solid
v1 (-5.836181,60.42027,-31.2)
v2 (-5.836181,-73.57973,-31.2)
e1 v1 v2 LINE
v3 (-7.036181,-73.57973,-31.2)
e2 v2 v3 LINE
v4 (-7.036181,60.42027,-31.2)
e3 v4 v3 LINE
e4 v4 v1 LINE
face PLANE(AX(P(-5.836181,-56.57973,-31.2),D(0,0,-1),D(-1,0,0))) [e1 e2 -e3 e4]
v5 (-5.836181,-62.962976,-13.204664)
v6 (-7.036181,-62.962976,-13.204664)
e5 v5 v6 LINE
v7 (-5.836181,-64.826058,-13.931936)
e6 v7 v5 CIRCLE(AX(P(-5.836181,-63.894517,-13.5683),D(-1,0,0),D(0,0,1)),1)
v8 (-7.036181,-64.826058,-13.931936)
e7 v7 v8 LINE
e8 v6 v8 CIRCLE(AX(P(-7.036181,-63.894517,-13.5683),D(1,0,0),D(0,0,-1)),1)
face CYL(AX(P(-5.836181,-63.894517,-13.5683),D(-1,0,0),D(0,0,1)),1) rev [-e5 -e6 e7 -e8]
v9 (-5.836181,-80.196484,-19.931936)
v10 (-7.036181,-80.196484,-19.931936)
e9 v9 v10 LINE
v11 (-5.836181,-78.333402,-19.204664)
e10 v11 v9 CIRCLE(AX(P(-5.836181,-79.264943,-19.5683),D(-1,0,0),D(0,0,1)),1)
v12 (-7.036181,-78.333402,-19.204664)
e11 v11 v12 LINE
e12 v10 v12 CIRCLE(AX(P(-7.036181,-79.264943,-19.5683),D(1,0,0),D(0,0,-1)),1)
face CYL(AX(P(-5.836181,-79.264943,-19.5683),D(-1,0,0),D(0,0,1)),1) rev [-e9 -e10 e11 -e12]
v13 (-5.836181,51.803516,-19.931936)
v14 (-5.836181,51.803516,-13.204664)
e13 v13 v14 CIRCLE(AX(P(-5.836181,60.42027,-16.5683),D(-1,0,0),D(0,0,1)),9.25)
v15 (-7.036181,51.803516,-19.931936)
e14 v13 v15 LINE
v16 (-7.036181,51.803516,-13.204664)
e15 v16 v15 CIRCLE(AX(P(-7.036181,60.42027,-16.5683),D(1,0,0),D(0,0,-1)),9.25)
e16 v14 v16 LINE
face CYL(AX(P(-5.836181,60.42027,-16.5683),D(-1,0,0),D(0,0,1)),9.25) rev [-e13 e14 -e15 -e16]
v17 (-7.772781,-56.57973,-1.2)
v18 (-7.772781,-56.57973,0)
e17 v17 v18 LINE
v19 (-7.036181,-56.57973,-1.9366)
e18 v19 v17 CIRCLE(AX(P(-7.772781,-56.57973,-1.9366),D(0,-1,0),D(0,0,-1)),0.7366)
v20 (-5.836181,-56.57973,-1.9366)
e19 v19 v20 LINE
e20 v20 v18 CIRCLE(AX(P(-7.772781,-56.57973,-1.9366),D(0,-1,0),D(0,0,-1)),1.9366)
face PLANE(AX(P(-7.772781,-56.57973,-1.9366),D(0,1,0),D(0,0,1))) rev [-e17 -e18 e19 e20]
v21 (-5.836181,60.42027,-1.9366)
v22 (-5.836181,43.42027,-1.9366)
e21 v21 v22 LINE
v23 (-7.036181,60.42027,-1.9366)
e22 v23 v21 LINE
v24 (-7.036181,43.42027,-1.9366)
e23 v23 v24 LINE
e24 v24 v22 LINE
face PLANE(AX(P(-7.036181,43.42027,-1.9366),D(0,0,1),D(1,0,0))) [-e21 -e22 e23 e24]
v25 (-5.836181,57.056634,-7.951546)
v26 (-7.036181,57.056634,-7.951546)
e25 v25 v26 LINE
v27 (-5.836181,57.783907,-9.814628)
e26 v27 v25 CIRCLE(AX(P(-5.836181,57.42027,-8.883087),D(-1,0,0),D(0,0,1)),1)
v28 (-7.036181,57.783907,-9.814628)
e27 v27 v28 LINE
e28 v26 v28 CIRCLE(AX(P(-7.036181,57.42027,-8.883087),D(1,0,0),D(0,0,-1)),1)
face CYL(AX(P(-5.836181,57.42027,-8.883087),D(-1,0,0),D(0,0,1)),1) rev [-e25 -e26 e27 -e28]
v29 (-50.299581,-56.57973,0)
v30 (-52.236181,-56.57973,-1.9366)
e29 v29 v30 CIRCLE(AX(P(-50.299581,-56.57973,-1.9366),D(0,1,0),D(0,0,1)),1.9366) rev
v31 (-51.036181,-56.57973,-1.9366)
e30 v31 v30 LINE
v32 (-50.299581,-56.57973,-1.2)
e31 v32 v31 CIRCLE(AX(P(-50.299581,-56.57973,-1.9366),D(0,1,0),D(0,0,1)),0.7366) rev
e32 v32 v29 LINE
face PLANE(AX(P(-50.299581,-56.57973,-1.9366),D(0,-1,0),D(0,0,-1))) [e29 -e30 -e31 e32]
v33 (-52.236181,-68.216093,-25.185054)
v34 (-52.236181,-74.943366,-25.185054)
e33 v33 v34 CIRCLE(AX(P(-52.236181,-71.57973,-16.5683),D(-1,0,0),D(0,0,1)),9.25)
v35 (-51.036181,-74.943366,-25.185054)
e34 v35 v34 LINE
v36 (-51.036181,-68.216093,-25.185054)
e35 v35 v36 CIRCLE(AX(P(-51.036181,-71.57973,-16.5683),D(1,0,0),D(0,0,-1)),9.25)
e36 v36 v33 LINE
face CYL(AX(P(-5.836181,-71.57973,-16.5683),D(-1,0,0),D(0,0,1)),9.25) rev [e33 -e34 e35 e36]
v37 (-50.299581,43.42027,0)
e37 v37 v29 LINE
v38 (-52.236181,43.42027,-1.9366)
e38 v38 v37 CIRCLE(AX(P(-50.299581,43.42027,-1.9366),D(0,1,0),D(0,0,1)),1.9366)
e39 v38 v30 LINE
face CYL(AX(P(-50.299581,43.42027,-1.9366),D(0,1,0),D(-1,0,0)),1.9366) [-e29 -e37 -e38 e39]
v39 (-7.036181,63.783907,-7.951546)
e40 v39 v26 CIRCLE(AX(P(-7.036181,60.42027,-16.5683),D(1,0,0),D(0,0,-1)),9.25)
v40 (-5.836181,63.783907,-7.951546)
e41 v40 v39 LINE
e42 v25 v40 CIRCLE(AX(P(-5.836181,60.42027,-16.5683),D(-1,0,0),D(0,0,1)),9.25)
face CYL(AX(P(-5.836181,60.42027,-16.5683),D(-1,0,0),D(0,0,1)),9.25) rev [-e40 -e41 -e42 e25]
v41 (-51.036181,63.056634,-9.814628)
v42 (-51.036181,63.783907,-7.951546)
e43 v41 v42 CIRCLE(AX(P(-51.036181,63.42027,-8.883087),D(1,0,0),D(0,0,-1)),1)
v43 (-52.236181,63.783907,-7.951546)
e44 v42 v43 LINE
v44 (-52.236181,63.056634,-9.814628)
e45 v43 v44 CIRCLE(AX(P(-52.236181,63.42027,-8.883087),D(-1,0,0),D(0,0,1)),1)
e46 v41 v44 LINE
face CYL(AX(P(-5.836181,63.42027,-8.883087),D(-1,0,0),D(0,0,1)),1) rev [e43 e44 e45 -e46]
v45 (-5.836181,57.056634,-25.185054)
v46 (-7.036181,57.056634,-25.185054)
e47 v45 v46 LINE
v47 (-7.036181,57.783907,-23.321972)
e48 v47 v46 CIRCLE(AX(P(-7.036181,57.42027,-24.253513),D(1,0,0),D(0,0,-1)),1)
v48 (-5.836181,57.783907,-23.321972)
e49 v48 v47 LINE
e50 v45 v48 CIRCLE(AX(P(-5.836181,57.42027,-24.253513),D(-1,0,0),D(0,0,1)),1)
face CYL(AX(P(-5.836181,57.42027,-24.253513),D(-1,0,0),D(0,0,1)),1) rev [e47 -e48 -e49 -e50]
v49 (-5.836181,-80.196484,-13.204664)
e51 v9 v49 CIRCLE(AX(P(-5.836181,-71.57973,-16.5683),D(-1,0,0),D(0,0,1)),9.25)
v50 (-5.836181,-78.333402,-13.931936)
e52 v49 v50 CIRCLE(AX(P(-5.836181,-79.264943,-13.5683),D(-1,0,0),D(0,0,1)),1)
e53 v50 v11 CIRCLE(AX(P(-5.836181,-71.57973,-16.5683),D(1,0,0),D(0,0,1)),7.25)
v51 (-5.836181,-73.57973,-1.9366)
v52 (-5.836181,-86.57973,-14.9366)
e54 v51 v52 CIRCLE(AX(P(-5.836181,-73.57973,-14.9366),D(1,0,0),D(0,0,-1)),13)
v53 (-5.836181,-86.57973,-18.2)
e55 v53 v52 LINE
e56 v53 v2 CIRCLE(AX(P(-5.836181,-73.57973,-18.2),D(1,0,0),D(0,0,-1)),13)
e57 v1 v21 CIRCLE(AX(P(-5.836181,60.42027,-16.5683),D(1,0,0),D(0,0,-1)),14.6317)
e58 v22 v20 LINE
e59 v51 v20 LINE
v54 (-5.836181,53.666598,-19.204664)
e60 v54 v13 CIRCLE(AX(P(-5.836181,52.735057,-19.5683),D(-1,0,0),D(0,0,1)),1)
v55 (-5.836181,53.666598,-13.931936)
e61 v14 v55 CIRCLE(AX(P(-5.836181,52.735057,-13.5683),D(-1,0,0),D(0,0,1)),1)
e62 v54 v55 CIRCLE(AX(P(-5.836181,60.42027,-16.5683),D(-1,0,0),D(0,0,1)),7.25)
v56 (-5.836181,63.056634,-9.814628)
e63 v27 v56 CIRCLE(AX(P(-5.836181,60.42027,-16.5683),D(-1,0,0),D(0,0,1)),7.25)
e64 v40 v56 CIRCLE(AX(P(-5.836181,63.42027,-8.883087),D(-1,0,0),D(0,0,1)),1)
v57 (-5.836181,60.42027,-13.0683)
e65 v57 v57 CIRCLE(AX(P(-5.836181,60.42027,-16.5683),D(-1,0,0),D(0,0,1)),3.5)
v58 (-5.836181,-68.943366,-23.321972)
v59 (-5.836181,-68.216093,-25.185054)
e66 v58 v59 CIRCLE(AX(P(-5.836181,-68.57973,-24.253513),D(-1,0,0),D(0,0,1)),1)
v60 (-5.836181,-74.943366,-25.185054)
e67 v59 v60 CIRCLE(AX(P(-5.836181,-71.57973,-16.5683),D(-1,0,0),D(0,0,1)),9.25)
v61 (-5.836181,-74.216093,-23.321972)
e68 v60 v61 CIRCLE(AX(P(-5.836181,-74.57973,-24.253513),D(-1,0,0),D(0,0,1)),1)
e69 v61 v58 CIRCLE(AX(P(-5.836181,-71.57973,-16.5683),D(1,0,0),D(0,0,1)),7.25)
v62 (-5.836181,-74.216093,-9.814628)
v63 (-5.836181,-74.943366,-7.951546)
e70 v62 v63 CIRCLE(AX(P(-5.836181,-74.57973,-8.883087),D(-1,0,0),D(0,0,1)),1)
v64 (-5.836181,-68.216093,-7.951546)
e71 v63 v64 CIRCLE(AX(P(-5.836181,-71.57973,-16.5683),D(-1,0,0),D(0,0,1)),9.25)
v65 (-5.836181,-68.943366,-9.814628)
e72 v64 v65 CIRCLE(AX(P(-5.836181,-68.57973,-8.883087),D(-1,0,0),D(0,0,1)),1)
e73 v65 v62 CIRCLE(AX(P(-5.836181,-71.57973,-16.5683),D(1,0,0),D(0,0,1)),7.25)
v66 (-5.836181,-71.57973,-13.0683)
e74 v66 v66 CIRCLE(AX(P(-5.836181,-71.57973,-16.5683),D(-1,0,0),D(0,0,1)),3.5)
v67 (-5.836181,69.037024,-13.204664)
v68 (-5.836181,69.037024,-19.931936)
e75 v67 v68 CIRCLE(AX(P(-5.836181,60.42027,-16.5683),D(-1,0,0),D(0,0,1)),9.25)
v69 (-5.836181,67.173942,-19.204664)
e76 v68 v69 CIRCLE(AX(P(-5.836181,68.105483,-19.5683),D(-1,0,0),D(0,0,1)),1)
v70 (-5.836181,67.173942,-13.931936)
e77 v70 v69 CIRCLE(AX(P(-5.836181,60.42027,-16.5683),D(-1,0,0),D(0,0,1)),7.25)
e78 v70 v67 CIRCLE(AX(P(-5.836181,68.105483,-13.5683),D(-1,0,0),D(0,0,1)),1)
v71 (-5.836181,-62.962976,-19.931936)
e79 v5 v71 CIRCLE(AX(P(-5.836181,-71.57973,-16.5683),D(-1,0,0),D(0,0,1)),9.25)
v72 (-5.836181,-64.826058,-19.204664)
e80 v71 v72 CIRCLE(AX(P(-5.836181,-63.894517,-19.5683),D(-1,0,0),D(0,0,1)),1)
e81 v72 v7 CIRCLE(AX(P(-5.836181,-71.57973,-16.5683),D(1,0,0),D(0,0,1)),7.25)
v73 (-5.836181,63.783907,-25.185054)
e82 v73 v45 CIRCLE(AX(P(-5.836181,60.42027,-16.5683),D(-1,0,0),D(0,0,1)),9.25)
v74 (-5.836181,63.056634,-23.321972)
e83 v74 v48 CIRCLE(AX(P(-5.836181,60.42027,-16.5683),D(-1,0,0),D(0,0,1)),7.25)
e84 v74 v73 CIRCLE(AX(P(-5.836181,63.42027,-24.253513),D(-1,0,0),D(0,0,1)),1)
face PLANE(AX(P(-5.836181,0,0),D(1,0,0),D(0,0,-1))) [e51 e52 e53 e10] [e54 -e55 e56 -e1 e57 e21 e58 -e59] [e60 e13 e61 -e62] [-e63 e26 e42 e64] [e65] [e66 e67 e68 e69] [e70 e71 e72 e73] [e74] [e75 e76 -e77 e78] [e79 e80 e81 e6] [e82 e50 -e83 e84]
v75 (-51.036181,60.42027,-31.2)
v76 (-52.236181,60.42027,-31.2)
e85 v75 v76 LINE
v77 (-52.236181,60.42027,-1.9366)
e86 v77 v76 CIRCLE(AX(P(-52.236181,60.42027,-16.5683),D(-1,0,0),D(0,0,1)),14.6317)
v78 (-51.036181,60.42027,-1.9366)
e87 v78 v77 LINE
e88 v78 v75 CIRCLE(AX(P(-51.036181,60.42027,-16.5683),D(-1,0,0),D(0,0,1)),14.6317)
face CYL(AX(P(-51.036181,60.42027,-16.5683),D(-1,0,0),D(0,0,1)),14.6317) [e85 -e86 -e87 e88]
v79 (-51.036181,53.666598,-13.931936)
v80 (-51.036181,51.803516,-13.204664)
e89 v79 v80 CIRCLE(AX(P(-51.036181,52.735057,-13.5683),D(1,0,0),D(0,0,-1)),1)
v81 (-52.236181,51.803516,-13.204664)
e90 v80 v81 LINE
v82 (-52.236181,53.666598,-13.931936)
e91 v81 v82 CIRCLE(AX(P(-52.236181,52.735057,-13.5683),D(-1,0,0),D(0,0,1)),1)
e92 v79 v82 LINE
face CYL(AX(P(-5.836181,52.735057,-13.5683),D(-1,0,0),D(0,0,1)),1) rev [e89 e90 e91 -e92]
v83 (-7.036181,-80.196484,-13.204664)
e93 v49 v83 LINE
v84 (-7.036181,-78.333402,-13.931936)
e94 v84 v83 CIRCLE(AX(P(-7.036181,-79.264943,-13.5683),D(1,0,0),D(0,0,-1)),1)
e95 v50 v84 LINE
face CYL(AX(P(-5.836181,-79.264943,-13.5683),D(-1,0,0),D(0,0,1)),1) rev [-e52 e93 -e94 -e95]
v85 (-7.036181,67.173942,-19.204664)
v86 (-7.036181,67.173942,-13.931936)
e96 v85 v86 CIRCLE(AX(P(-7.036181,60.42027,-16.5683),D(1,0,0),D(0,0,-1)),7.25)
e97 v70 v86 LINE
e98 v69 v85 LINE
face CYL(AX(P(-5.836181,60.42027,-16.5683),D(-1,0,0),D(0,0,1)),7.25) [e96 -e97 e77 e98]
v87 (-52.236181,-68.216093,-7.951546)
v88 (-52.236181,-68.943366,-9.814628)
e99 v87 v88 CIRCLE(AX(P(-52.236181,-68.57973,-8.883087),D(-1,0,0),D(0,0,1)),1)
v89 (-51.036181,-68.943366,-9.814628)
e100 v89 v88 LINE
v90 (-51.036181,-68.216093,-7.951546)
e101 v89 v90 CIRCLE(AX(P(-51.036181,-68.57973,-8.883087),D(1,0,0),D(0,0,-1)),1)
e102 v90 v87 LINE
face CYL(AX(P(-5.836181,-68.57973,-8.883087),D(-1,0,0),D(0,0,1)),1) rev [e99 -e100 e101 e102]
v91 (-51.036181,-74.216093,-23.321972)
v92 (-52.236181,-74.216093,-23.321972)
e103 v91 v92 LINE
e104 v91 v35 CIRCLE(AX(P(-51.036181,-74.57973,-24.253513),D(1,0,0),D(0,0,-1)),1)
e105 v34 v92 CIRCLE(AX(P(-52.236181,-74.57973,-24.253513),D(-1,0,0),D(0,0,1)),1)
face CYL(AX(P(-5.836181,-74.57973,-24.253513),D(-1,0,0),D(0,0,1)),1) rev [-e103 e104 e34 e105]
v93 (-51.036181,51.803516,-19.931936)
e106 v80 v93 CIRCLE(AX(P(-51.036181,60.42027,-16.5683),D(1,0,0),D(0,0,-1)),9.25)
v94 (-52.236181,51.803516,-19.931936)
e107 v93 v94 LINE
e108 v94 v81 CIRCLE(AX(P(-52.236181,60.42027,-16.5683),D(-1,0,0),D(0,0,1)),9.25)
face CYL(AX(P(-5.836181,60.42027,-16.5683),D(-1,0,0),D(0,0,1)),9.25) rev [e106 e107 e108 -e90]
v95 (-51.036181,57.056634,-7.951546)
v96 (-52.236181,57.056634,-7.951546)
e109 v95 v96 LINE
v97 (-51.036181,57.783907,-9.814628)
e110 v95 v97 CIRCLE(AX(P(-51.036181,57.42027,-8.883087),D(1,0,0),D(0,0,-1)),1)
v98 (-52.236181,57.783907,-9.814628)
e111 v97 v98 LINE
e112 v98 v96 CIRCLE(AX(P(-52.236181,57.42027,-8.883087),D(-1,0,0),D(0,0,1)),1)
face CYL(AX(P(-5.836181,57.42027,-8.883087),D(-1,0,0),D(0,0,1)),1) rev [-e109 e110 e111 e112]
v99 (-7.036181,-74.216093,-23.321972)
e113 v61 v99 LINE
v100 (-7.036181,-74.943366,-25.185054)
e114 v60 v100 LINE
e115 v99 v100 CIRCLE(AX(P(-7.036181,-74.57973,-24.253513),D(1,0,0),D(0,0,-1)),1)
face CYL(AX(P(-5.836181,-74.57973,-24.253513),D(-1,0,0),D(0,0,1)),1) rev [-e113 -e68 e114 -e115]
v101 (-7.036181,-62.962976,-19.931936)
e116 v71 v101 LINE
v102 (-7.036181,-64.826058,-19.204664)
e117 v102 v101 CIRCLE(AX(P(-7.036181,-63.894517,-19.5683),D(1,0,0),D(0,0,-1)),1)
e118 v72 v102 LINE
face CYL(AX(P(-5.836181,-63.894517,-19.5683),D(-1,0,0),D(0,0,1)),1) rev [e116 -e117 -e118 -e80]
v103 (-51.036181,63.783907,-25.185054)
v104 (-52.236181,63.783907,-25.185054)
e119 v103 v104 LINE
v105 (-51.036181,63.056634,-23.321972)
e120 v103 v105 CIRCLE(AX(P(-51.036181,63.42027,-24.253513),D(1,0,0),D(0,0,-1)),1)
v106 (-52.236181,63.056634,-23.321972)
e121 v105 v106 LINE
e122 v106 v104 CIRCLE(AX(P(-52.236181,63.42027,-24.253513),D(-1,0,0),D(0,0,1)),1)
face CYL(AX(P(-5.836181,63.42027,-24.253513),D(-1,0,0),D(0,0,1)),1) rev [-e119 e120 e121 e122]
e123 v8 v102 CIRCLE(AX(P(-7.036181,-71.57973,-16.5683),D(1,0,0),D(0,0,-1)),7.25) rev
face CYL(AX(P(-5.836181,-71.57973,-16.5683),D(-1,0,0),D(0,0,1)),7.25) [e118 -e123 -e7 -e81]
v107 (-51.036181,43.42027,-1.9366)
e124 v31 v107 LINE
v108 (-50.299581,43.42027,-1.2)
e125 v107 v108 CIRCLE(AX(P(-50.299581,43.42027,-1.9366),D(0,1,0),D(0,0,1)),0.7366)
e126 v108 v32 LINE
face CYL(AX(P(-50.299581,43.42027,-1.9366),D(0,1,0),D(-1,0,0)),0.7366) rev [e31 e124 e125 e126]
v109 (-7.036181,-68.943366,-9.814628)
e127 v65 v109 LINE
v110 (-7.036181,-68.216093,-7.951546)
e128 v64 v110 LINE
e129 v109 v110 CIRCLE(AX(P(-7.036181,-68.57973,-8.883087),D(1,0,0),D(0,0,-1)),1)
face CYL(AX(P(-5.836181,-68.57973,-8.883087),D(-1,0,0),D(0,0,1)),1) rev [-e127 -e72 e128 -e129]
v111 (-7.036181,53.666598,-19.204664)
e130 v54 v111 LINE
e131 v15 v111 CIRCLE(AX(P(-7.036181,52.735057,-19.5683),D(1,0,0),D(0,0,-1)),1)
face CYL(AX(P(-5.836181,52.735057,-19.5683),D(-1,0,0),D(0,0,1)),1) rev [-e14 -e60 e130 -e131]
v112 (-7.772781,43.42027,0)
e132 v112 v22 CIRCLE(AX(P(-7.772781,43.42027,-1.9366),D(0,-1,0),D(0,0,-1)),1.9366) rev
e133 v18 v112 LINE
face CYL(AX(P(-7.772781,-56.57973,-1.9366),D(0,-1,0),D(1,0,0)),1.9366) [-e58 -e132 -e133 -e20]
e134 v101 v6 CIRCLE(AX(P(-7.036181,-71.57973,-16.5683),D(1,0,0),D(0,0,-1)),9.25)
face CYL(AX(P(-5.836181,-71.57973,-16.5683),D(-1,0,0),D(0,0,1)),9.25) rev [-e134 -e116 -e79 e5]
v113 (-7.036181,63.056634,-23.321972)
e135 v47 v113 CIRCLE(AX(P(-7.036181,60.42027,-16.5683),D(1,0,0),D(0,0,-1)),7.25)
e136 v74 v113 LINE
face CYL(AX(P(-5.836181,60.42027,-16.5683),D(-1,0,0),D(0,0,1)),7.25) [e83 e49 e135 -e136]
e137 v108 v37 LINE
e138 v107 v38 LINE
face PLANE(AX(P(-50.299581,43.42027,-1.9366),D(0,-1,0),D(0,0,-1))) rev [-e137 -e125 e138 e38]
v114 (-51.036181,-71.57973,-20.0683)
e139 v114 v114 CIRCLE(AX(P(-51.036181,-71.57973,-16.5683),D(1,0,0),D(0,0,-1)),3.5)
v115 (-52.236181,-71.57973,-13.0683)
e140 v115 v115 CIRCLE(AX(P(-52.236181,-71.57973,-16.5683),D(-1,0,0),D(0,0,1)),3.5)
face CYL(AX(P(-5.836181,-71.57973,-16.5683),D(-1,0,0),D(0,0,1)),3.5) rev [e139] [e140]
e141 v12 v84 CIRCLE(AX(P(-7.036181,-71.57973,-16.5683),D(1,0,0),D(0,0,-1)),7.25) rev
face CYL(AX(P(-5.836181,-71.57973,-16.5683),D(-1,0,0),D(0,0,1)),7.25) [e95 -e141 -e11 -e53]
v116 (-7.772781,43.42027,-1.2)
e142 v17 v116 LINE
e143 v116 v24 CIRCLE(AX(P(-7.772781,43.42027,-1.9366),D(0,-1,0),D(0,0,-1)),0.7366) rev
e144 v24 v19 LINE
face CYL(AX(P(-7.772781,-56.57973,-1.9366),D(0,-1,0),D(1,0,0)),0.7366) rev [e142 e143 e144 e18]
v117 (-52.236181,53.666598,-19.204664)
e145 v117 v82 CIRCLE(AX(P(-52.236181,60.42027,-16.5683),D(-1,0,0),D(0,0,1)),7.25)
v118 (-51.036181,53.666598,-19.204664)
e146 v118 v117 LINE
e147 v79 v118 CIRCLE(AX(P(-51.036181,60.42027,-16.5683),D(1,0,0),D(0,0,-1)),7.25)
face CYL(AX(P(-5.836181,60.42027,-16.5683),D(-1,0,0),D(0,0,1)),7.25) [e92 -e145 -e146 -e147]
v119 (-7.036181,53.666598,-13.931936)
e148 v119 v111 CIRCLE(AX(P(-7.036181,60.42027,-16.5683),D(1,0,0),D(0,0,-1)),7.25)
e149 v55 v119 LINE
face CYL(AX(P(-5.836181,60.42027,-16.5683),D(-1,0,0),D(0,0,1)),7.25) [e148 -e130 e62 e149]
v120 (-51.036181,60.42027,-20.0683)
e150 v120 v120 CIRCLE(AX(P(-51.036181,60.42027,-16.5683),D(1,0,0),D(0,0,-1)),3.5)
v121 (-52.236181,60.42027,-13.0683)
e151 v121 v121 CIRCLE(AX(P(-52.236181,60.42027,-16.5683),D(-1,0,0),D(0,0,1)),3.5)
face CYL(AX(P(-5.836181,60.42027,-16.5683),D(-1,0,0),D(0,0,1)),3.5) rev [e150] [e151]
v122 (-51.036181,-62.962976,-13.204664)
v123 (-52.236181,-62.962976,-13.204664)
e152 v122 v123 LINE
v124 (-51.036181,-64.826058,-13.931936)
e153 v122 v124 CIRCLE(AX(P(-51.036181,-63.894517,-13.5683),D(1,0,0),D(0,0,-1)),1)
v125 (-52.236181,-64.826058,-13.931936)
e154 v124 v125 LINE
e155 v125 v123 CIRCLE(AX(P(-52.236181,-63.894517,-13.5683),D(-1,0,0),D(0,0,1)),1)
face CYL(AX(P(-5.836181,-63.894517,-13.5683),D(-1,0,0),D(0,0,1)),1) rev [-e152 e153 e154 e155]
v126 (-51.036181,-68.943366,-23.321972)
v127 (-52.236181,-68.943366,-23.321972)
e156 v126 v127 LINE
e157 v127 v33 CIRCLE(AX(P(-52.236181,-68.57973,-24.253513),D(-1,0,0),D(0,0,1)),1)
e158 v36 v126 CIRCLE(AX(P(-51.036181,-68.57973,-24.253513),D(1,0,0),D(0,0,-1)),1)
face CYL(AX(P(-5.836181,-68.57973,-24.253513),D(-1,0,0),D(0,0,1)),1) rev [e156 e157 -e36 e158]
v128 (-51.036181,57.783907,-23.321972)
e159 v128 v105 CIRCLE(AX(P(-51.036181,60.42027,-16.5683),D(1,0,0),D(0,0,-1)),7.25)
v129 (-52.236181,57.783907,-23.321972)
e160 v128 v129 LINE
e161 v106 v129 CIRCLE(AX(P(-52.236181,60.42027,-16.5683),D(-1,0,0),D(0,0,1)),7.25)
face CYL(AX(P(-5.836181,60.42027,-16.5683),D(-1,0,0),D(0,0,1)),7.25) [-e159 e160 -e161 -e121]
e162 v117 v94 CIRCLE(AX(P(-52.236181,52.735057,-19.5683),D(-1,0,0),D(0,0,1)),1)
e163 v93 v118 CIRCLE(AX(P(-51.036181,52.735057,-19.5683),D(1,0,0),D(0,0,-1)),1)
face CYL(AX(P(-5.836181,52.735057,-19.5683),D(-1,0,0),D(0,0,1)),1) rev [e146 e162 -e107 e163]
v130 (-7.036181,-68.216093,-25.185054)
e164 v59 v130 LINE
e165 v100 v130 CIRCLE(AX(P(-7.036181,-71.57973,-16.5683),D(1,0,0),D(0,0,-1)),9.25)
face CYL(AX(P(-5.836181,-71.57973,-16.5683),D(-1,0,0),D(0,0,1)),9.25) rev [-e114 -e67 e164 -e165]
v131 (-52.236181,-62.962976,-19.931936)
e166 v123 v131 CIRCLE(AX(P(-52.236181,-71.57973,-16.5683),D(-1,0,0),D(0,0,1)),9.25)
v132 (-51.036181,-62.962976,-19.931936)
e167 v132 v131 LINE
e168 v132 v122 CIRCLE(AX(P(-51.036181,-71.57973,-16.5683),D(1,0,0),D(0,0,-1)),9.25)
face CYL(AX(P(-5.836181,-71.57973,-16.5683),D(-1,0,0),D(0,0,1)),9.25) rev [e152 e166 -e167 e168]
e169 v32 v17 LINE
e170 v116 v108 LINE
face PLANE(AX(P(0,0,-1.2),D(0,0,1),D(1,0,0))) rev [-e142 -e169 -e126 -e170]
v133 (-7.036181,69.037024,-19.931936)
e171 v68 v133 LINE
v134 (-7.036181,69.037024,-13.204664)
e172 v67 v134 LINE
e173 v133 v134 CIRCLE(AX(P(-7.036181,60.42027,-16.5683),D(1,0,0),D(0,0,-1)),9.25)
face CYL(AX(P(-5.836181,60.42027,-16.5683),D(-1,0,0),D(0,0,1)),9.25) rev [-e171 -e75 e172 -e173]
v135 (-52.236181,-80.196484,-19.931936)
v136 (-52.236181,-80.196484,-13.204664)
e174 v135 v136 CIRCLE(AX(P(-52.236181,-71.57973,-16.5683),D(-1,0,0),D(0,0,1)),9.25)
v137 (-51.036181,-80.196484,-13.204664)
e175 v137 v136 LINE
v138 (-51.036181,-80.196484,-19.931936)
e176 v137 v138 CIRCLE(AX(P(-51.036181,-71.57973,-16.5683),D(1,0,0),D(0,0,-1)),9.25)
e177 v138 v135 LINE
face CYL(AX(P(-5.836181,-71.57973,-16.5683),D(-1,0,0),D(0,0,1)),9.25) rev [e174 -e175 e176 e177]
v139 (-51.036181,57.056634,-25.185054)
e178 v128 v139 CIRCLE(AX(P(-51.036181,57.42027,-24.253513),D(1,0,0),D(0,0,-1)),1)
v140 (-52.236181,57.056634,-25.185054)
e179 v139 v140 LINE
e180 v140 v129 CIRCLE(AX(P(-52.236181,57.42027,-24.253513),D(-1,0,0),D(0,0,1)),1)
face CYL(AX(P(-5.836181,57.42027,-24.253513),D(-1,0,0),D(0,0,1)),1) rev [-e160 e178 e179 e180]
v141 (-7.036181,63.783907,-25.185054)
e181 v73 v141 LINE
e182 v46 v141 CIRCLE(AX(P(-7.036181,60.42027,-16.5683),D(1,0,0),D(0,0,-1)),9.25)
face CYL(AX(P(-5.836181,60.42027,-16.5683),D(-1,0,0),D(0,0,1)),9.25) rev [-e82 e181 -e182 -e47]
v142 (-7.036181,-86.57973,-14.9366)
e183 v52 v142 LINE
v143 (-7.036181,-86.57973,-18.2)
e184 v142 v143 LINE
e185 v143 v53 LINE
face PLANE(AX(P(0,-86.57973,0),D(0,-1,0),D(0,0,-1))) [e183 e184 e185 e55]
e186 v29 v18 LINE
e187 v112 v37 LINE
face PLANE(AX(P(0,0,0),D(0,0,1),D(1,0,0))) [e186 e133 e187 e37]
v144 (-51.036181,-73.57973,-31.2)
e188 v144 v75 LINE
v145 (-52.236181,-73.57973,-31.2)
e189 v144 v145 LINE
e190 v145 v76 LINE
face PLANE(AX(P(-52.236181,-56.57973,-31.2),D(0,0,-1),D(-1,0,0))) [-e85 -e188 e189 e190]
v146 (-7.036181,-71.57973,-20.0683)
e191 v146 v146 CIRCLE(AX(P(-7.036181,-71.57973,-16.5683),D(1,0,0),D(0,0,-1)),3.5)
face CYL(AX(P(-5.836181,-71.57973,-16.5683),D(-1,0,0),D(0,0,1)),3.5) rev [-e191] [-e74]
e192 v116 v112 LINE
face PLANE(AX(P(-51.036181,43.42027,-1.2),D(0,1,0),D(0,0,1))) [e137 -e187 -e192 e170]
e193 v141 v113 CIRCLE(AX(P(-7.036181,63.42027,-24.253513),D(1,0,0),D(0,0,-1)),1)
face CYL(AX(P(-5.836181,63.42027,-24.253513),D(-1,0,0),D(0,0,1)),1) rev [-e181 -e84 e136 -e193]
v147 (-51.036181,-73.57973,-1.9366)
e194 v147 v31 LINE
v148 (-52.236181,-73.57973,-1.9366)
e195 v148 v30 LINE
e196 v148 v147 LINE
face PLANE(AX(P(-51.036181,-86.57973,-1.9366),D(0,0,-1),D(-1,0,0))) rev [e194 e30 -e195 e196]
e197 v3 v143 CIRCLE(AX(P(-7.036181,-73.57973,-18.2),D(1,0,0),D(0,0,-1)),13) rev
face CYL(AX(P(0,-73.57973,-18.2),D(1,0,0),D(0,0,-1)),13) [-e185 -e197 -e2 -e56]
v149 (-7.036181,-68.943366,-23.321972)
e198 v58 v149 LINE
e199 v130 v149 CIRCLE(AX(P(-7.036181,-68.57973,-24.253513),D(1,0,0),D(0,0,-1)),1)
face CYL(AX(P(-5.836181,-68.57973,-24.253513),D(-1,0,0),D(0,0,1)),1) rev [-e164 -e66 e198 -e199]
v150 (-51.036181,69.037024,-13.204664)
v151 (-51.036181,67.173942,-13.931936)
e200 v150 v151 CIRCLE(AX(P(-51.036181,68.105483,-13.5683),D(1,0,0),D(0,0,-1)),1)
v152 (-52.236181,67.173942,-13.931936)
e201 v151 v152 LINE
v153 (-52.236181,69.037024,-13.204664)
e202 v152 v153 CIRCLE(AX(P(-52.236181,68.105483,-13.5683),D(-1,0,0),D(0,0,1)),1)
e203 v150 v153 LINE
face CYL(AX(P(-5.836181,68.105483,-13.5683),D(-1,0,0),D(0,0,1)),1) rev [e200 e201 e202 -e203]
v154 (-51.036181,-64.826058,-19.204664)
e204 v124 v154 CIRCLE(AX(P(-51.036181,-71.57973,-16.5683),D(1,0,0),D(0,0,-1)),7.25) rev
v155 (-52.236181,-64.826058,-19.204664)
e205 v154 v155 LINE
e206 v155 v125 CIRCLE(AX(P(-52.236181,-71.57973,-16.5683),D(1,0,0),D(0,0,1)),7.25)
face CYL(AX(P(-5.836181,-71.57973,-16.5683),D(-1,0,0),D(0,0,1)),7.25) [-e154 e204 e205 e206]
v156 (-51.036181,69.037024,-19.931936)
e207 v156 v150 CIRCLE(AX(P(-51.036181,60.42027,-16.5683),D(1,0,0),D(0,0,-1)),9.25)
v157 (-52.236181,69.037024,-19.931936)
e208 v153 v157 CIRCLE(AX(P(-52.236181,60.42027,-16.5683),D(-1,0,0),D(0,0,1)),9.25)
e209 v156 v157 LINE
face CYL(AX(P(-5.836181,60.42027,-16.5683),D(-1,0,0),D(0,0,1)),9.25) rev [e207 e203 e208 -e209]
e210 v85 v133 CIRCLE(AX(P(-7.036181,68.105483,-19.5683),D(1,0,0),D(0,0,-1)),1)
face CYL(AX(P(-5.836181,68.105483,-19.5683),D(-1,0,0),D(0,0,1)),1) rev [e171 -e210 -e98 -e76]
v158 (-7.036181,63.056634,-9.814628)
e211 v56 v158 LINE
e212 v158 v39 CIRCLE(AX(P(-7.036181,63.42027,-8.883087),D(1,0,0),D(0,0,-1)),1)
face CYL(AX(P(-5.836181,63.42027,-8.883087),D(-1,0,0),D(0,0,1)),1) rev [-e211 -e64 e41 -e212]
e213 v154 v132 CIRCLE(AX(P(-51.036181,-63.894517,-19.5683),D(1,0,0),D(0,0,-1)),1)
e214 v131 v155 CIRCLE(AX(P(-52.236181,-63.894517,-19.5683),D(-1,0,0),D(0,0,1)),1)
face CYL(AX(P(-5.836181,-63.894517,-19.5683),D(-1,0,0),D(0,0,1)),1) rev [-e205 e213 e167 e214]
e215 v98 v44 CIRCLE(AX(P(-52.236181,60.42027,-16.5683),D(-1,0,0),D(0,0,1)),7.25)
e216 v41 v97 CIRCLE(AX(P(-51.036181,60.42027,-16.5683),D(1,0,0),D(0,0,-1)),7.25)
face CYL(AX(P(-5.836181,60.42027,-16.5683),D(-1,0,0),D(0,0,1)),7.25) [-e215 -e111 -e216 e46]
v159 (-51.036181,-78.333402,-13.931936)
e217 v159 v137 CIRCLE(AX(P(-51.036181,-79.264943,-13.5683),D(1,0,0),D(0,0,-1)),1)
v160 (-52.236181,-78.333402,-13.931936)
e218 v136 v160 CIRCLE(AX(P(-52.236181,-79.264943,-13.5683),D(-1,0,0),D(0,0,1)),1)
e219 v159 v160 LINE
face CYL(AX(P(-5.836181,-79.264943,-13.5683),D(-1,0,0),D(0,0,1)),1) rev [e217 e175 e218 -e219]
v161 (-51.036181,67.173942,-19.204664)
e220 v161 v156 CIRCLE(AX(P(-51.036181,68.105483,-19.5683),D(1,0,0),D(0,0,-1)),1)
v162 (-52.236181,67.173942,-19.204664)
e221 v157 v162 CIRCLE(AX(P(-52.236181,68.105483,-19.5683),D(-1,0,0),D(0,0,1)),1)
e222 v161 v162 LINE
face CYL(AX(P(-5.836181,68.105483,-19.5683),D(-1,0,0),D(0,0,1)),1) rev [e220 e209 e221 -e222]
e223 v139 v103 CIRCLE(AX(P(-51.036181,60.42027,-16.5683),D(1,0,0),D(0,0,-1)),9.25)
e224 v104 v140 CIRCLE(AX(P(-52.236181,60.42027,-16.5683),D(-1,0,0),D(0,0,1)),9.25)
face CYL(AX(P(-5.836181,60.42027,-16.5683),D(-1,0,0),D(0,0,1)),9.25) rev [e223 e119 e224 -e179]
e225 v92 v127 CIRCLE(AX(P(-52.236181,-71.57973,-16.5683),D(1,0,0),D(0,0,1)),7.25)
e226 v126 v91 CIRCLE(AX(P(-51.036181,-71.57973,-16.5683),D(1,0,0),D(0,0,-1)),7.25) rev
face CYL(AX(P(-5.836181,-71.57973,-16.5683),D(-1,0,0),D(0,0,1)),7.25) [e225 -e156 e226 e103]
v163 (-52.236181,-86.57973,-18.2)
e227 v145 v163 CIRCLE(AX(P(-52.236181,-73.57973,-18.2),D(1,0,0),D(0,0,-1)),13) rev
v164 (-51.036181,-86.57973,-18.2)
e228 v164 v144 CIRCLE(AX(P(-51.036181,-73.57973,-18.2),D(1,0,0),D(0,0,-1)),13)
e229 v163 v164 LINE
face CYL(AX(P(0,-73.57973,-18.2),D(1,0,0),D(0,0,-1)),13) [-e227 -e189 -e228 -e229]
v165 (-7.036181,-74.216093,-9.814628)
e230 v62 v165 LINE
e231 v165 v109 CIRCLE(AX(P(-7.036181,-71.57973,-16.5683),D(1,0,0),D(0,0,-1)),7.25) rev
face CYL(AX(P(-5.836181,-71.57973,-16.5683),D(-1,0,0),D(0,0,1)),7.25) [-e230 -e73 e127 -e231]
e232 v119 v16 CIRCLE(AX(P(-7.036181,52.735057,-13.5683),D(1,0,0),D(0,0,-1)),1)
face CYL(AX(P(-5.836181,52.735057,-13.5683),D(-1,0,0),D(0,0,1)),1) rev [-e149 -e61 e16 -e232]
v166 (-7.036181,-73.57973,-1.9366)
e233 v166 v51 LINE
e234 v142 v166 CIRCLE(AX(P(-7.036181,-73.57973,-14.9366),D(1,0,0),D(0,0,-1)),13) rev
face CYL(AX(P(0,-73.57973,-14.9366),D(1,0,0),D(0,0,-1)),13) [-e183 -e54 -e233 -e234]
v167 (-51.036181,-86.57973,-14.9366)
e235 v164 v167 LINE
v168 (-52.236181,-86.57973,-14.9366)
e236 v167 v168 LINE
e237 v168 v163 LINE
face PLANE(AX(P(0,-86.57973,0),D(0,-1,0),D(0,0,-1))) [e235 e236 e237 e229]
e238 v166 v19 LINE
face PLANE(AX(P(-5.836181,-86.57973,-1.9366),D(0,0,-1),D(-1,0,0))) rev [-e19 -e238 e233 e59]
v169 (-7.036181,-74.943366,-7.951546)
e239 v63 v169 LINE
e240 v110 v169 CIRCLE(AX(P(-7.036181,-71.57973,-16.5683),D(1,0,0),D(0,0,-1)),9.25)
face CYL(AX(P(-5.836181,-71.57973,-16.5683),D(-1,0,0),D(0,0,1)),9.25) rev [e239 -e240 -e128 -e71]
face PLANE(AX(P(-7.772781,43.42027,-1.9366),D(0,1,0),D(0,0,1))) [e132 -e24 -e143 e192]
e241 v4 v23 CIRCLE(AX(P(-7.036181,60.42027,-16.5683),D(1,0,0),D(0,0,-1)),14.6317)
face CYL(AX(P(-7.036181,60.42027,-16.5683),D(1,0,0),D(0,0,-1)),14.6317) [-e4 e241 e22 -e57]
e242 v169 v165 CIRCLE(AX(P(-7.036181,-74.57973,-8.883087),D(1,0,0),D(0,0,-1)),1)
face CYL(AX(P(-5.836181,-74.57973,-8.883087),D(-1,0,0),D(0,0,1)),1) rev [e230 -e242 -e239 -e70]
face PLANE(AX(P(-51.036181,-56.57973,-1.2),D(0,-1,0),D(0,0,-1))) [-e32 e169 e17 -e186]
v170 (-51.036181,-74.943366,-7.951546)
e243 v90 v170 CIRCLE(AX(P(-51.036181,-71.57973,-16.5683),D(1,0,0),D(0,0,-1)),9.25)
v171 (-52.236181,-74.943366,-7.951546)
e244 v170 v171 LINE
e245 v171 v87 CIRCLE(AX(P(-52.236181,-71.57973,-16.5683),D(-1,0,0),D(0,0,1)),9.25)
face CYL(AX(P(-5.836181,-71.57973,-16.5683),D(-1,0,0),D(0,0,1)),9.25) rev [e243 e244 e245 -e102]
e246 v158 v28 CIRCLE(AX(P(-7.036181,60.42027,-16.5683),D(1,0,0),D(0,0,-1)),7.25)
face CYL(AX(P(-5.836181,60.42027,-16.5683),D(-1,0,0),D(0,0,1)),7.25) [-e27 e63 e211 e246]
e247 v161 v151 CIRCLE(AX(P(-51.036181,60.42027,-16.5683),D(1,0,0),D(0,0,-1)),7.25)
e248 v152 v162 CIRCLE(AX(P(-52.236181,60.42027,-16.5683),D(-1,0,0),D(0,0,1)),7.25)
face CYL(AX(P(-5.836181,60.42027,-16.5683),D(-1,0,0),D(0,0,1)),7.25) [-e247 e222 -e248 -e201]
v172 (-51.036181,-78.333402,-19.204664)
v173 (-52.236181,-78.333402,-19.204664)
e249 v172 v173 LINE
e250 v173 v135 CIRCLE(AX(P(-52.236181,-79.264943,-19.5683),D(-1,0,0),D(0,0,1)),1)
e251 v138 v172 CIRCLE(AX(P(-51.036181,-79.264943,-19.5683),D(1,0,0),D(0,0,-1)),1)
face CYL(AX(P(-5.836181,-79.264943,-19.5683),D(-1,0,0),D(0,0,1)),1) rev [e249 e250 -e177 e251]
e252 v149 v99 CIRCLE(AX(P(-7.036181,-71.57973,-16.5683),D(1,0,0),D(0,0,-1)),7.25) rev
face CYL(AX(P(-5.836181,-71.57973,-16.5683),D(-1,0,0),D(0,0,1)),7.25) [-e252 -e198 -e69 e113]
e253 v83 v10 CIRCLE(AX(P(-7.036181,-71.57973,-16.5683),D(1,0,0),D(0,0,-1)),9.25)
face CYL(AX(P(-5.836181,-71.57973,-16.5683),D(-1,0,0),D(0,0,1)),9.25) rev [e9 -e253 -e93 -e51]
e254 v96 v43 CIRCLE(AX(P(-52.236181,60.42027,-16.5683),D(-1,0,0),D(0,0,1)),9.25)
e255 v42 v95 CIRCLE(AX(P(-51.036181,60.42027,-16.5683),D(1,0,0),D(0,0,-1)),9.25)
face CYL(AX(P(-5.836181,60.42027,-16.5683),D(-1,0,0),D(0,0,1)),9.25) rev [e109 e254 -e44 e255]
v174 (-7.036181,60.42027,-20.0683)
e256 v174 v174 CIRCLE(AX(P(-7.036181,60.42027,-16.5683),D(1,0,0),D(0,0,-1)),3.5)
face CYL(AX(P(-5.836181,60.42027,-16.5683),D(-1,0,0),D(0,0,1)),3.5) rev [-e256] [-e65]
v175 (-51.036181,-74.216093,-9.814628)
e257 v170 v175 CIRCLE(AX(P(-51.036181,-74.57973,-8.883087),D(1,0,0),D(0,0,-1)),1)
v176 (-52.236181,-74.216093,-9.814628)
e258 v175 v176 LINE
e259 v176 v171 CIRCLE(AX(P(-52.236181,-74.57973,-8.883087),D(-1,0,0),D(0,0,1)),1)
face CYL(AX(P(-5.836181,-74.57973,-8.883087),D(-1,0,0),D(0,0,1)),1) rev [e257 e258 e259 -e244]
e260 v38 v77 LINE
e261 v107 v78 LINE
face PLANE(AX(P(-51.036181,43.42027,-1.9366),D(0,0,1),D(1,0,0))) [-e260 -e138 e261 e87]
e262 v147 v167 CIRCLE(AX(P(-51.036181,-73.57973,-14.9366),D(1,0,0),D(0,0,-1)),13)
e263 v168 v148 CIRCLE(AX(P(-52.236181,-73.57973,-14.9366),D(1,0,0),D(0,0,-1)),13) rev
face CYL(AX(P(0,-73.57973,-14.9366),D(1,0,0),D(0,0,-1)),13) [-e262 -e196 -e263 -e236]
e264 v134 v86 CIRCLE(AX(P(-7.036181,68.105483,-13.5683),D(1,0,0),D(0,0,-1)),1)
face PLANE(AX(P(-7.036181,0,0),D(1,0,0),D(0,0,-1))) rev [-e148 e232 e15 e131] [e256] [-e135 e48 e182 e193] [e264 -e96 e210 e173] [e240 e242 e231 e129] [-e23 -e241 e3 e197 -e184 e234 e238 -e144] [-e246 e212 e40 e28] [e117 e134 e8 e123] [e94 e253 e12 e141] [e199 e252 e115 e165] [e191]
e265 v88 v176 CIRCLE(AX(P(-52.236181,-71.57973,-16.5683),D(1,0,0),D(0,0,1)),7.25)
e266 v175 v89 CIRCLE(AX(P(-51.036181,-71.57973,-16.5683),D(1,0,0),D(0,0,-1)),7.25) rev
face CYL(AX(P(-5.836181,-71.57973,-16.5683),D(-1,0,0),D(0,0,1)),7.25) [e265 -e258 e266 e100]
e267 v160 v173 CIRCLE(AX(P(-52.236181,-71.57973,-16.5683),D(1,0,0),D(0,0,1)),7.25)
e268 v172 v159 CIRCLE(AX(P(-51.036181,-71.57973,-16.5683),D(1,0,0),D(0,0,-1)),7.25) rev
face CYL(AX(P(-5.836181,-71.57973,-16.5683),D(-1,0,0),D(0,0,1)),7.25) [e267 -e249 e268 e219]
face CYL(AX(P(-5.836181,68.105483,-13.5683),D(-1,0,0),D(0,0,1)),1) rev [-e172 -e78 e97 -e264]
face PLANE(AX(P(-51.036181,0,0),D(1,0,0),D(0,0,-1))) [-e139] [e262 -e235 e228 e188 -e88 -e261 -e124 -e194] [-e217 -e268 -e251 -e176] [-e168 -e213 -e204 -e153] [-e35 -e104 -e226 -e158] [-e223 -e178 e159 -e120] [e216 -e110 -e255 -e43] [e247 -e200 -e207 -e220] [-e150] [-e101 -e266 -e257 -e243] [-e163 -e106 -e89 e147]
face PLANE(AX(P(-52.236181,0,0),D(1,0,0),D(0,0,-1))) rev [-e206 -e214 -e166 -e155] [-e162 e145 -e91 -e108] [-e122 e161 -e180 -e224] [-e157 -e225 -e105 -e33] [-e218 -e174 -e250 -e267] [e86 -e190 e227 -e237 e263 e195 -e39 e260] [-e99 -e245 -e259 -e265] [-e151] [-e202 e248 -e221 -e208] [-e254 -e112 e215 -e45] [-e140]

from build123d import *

# Parameters (mm, degrees)
SKETCH_1_W                         = 44
SKETCH_1_H                         = 100
SM_BASE_FLANGE_1_DEPTH             = 1.2
SM_EDGE_FLANGE_2_STRIP_W           = 6.2732
SM_EDGE_FLANGE_2_STRIP_H           = 1.2
SM_EDGE_FLANGE_2_STRIP_CUT_DEPTH   = 100
SM_EDGE_FLANGE_2_STRIP_2_W         = 6.2732
SM_EDGE_FLANGE_2_STRIP_2_H         = 1.2
SM_EDGE_FLANGE_2_STRIP_CUT_2_DEPTH = 100
SM_EDGE_FLANGE_2_DEPTH             = 100
SM_EDGE_FLANGE_2_BEND_DEPTH        = 100
EXTRUDE_1_DEPTH                    = 1.2
EXTRUDE_START                      = -1.2
EXTRUDE_2_DEPTH                    = 1.2
SKETCH_44_R                        = 3.5
CUT_EXTRUDE_3_DEPTH                = 94.590588423
SKETCH_45_W                        = 1.2
SKETCH_45_H                        = 29.2634
EXTRUDE_3_DEPTH                    = 30
SKETCH_48_R                        = 3.5
CUT_EXTRUDE_4_DEPTH                = 104.065268641
FILLET_1_R                         = 13


# Sheet-metal steps are written as plain solids
with BuildPart() as part:
    # Sketch 1 → 基材-凸緣1 (new body)
    with BuildSketch(Plane.XY):
        with Locations((-29.036181479, -6.57972973)):
            Rectangle(SKETCH_1_W, SKETCH_1_H)
    extrude(amount=-SM_BASE_FLANGE_1_DEPTH)

    # 邊線-凸緣2 strip (across the edge) → 邊線-凸緣2 strip cut (cut)
    with BuildSketch(Plane(origin=(-7.036181479, 43.42027027, -1.2), x_dir=(-1, 0, 0), z_dir=(0, -1, 0))):
        with Locations((-2.4, -0.6)):
            Rectangle(SM_EDGE_FLANGE_2_STRIP_W, SM_EDGE_FLANGE_2_STRIP_H)
    extrude(amount=SM_EDGE_FLANGE_2_STRIP_CUT_DEPTH, mode=Mode.SUBTRACT)

    # 邊線-凸緣2 strip 2 (across the edge) → 邊線-凸緣2 strip cut 2 (cut)
    with BuildSketch(Plane(origin=(-51.036181479, -56.57972973, -1.2), x_dir=(1, 0, 0), z_dir=(0, 1, 0))):
        with Locations((-2.4, -0.6)):
            Rectangle(SM_EDGE_FLANGE_2_STRIP_2_W, SM_EDGE_FLANGE_2_STRIP_2_H)
    extrude(amount=SM_EDGE_FLANGE_2_STRIP_CUT_2_DEPTH, mode=Mode.SUBTRACT)

    # 邊線-凸緣2 section (across the edge) → 邊線-凸緣2 (add)
    with BuildSketch(Plane(origin=(-7.036181479, 43.42027027, -1.2), x_dir=(-1, 0, 0), z_dir=(0, -1, 0))):
        with BuildLine():
            Line((-1.2, 0.7366), (-1.2, 30))
            Line((-1.2, 30), (0, 30))
            Line((0, 30), (0, 0.7366))
            ThreePointArc((0, 0.7366), (0.215745145, 0.215745145), (0.7366, 0))
            Line((0.7366, 0), (0.7366, -1.2))
            ThreePointArc((0.7366, -1.2), (-0.632782992, -0.632782992), (-1.2, 0.7366))
        make_face()
    extrude(amount=SM_EDGE_FLANGE_2_DEPTH)

    # 邊線-凸緣2 section 2 (across the edge) → 邊線-凸緣2 bend (add)
    with BuildSketch(Plane(origin=(-51.036181479, -56.57972973, -1.2), x_dir=(1, 0, 0), z_dir=(0, 1, 0))):
        with BuildLine():
            Line((-1.2, 0.7366), (-1.2, 30))
            Line((-1.2, 30), (0, 30))
            Line((0, 30), (0, 0.7366))
            ThreePointArc((0, 0.7366), (0.215745145, 0.215745145), (0.7366, 0))
            Line((0.7366, 0), (0.7366, -1.2))
            ThreePointArc((0.7366, -1.2), (-0.632782992, -0.632782992), (-1.2, 0.7366))
        make_face()
    extrude(amount=SM_EDGE_FLANGE_2_BEND_DEPTH)

    # 草圖38 → 填料-伸長1 (add)
    with BuildSketch(Plane(origin=(-5.836181479, 0, 0), x_dir=(0, 0, -1), z_dir=(1, 0, 0))):
        with BuildLine():
            Line((1.9366, 43.42027027), (31.2, 43.42027027))
            Line((31.2, 43.42027027), (31.2, 60.42027027))
            ThreePointArc((31.2, 60.42027027), (16.5683, 75.05197027), (1.9366, 60.42027027))
            Line((1.9366, 60.42027027), (1.9366, 43.42027027))
        make_face()
    extrude(amount=-EXTRUDE_1_DEPTH)

    # 草圖41 → 填料-伸長2 (add)
    with BuildSketch(Plane.ZY.offset(52.236181479).offset(EXTRUDE_START)):
        with BuildLine():
            Line((-1.9366, 43.42027027), (-31.2, 43.42027027))
            Line((-31.2, 43.42027027), (-31.2, 60.42027027))
            ThreePointArc((-31.2, 60.42027027), (-16.5683, 75.05197027), (-1.9366, 60.42027027))
            Line((-1.9366, 60.42027027), (-1.9366, 43.42027027))
        make_face()
    extrude(amount=EXTRUDE_2_DEPTH)

    # 草圖44 → 除料-伸長3 (cut, through all)
    with BuildSketch(Plane.ZY.offset(52.236181479)):
        with Locations((-16.5683, 60.42027027)):
            Circle(SKETCH_44_R)
        with BuildLine():
            ThreePointArc((-13.204663636, 69.037024323), (-16.5683, 69.67027027), (-19.931936364, 69.037024323))
            ThreePointArc((-19.931936364, 69.037024323), (-20.499840979, 67.741846981), (-19.204663636, 67.173942366))
            ThreePointArc((-19.204663636, 67.173942366), (-16.5683, 67.67027027), (-13.931936364, 67.173942366))
            ThreePointArc((-13.931936364, 67.173942366), (-12.636759021, 67.741846981), (-13.204663636, 69.037024323))
        make_face()
        with BuildLine():
            ThreePointArc((-7.951545947, 57.056633907), (-7.3183, 60.42027027), (-7.951545947, 63.783906634))
            ThreePointArc((-7.951545947, 63.783906634), (-9.246723289, 64.351811249), (-9.814627904, 63.056633907))
            ThreePointArc((-9.814627904, 63.056633907), (-9.3183, 60.42027027), (-9.814627904, 57.783906634))
            ThreePointArc((-9.814627904, 57.783906634), (-9.246723289, 56.488729292), (-7.951545947, 57.056633907))
        make_face()
        with BuildLine():
            ThreePointArc((-19.931936364, 51.803516217), (-16.5683, 51.17027027), (-13.204663636, 51.803516217))
            ThreePointArc((-13.204663636, 51.803516217), (-12.636759021, 53.098693559), (-13.931936364, 53.666598175))
            ThreePointArc((-13.931936364, 53.666598175), (-16.5683, 53.17027027), (-19.204663636, 53.666598175))
            ThreePointArc((-19.204663636, 53.666598175), (-20.499840979, 53.098693559), (-19.931936364, 51.803516217))
        make_face()
        with BuildLine():
            ThreePointArc((-25.185054053, 63.783906634), (-25.8183, 60.42027027), (-25.185054053, 57.056633907))
            ThreePointArc((-25.185054053, 57.056633907), (-23.889876711, 56.488729292), (-23.321972096, 57.783906634))
            ThreePointArc((-23.321972096, 57.783906634), (-23.8183, 60.42027027), (-23.321972096, 63.056633907))
            ThreePointArc((-23.321972096, 63.056633907), (-23.889876711, 64.351811249), (-25.185054053, 63.783906634))
        make_face()
    extrude(amount=-CUT_EXTRUDE_3_DEPTH, mode=Mode.SUBTRACT)

    # 草圖45 → 填料-伸長3 (add)
    with BuildSketch(Plane.XZ.offset(56.57972973)):
        with Locations((-51.636181479, -16.5683)):
            Rectangle(SKETCH_45_W, SKETCH_45_H)
        with Locations((-6.436181479, -16.5683)):
            Rectangle(SKETCH_45_W, SKETCH_45_H)
    extrude(amount=EXTRUDE_3_DEPTH)

    # 草圖48 → 除料-伸長4 (cut, through all)
    with BuildSketch(Plane.ZY.offset(52.236181479)):
        with Locations((-16.5683, -71.57972973)):
            Circle(SKETCH_48_R)
        with BuildLine():
            ThreePointArc((-7.951545947, -74.943366093), (-7.3183, -71.57972973), (-7.951545947, -68.216093366))
            ThreePointArc((-7.951545947, -68.216093366), (-9.246723289, -67.648188751), (-9.814627904, -68.943366093))
            ThreePointArc((-9.814627904, -68.943366093), (-9.3183, -71.57972973), (-9.814627904, -74.216093366))
            ThreePointArc((-9.814627904, -74.216093366), (-9.246723289, -75.511270708), (-7.951545947, -74.943366093))
        make_face()
        with BuildLine():
            ThreePointArc((-19.204663636, -78.333401825), (-16.5683, -78.82972973), (-13.931936364, -78.333401825))
            ThreePointArc((-13.931936364, -78.333401825), (-12.636759021, -78.901306441), (-13.204663636, -80.196483783))
            ThreePointArc((-13.204663636, -80.196483783), (-16.5683, -80.82972973), (-19.931936364, -80.196483783))
            ThreePointArc((-19.931936364, -80.196483783), (-20.499840979, -78.901306441), (-19.204663636, -78.333401825))
        make_face()
        with BuildLine():
            ThreePointArc((-23.321972096, -68.943366093), (-23.8183, -71.57972973), (-23.321972096, -74.216093366))
            ThreePointArc((-23.321972096, -74.216093366), (-23.889876711, -75.511270708), (-25.185054053, -74.943366093))
            ThreePointArc((-25.185054053, -74.943366093), (-25.8183, -71.57972973), (-25.185054053, -68.216093366))
            ThreePointArc((-25.185054053, -68.216093366), (-23.889876711, -67.648188751), (-23.321972096, -68.943366093))
        make_face()
        with BuildLine():
            ThreePointArc((-13.931936364, -64.826057634), (-16.5683, -64.32972973), (-19.204663636, -64.826057634))
            ThreePointArc((-19.204663636, -64.826057634), (-20.499840979, -64.258153019), (-19.931936364, -62.962975677))
            ThreePointArc((-19.931936364, -62.962975677), (-16.5683, -62.32972973), (-13.204663636, -62.962975677))
            ThreePointArc((-13.204663636, -62.962975677), (-12.636759021, -64.258153019), (-13.931936364, -64.826057634))
        make_face()
    extrude(amount=-CUT_EXTRUDE_4_DEPTH, mode=Mode.SUBTRACT)

    # 圓角1
    fillet_1_edges = [part.edges().sort_by_distance(p)[0] for p in [
        (-51.636181479, -86.57972973, -31.2),
        (-51.636181479, -86.57972973, -1.9366),
        (-6.436181479, -86.57972973, -31.2),
        (-6.436181479, -86.57972973, -1.9366),
    ]]
    fillet(fillet_1_edges, radius=FILLET_1_R)


solid = part.part
